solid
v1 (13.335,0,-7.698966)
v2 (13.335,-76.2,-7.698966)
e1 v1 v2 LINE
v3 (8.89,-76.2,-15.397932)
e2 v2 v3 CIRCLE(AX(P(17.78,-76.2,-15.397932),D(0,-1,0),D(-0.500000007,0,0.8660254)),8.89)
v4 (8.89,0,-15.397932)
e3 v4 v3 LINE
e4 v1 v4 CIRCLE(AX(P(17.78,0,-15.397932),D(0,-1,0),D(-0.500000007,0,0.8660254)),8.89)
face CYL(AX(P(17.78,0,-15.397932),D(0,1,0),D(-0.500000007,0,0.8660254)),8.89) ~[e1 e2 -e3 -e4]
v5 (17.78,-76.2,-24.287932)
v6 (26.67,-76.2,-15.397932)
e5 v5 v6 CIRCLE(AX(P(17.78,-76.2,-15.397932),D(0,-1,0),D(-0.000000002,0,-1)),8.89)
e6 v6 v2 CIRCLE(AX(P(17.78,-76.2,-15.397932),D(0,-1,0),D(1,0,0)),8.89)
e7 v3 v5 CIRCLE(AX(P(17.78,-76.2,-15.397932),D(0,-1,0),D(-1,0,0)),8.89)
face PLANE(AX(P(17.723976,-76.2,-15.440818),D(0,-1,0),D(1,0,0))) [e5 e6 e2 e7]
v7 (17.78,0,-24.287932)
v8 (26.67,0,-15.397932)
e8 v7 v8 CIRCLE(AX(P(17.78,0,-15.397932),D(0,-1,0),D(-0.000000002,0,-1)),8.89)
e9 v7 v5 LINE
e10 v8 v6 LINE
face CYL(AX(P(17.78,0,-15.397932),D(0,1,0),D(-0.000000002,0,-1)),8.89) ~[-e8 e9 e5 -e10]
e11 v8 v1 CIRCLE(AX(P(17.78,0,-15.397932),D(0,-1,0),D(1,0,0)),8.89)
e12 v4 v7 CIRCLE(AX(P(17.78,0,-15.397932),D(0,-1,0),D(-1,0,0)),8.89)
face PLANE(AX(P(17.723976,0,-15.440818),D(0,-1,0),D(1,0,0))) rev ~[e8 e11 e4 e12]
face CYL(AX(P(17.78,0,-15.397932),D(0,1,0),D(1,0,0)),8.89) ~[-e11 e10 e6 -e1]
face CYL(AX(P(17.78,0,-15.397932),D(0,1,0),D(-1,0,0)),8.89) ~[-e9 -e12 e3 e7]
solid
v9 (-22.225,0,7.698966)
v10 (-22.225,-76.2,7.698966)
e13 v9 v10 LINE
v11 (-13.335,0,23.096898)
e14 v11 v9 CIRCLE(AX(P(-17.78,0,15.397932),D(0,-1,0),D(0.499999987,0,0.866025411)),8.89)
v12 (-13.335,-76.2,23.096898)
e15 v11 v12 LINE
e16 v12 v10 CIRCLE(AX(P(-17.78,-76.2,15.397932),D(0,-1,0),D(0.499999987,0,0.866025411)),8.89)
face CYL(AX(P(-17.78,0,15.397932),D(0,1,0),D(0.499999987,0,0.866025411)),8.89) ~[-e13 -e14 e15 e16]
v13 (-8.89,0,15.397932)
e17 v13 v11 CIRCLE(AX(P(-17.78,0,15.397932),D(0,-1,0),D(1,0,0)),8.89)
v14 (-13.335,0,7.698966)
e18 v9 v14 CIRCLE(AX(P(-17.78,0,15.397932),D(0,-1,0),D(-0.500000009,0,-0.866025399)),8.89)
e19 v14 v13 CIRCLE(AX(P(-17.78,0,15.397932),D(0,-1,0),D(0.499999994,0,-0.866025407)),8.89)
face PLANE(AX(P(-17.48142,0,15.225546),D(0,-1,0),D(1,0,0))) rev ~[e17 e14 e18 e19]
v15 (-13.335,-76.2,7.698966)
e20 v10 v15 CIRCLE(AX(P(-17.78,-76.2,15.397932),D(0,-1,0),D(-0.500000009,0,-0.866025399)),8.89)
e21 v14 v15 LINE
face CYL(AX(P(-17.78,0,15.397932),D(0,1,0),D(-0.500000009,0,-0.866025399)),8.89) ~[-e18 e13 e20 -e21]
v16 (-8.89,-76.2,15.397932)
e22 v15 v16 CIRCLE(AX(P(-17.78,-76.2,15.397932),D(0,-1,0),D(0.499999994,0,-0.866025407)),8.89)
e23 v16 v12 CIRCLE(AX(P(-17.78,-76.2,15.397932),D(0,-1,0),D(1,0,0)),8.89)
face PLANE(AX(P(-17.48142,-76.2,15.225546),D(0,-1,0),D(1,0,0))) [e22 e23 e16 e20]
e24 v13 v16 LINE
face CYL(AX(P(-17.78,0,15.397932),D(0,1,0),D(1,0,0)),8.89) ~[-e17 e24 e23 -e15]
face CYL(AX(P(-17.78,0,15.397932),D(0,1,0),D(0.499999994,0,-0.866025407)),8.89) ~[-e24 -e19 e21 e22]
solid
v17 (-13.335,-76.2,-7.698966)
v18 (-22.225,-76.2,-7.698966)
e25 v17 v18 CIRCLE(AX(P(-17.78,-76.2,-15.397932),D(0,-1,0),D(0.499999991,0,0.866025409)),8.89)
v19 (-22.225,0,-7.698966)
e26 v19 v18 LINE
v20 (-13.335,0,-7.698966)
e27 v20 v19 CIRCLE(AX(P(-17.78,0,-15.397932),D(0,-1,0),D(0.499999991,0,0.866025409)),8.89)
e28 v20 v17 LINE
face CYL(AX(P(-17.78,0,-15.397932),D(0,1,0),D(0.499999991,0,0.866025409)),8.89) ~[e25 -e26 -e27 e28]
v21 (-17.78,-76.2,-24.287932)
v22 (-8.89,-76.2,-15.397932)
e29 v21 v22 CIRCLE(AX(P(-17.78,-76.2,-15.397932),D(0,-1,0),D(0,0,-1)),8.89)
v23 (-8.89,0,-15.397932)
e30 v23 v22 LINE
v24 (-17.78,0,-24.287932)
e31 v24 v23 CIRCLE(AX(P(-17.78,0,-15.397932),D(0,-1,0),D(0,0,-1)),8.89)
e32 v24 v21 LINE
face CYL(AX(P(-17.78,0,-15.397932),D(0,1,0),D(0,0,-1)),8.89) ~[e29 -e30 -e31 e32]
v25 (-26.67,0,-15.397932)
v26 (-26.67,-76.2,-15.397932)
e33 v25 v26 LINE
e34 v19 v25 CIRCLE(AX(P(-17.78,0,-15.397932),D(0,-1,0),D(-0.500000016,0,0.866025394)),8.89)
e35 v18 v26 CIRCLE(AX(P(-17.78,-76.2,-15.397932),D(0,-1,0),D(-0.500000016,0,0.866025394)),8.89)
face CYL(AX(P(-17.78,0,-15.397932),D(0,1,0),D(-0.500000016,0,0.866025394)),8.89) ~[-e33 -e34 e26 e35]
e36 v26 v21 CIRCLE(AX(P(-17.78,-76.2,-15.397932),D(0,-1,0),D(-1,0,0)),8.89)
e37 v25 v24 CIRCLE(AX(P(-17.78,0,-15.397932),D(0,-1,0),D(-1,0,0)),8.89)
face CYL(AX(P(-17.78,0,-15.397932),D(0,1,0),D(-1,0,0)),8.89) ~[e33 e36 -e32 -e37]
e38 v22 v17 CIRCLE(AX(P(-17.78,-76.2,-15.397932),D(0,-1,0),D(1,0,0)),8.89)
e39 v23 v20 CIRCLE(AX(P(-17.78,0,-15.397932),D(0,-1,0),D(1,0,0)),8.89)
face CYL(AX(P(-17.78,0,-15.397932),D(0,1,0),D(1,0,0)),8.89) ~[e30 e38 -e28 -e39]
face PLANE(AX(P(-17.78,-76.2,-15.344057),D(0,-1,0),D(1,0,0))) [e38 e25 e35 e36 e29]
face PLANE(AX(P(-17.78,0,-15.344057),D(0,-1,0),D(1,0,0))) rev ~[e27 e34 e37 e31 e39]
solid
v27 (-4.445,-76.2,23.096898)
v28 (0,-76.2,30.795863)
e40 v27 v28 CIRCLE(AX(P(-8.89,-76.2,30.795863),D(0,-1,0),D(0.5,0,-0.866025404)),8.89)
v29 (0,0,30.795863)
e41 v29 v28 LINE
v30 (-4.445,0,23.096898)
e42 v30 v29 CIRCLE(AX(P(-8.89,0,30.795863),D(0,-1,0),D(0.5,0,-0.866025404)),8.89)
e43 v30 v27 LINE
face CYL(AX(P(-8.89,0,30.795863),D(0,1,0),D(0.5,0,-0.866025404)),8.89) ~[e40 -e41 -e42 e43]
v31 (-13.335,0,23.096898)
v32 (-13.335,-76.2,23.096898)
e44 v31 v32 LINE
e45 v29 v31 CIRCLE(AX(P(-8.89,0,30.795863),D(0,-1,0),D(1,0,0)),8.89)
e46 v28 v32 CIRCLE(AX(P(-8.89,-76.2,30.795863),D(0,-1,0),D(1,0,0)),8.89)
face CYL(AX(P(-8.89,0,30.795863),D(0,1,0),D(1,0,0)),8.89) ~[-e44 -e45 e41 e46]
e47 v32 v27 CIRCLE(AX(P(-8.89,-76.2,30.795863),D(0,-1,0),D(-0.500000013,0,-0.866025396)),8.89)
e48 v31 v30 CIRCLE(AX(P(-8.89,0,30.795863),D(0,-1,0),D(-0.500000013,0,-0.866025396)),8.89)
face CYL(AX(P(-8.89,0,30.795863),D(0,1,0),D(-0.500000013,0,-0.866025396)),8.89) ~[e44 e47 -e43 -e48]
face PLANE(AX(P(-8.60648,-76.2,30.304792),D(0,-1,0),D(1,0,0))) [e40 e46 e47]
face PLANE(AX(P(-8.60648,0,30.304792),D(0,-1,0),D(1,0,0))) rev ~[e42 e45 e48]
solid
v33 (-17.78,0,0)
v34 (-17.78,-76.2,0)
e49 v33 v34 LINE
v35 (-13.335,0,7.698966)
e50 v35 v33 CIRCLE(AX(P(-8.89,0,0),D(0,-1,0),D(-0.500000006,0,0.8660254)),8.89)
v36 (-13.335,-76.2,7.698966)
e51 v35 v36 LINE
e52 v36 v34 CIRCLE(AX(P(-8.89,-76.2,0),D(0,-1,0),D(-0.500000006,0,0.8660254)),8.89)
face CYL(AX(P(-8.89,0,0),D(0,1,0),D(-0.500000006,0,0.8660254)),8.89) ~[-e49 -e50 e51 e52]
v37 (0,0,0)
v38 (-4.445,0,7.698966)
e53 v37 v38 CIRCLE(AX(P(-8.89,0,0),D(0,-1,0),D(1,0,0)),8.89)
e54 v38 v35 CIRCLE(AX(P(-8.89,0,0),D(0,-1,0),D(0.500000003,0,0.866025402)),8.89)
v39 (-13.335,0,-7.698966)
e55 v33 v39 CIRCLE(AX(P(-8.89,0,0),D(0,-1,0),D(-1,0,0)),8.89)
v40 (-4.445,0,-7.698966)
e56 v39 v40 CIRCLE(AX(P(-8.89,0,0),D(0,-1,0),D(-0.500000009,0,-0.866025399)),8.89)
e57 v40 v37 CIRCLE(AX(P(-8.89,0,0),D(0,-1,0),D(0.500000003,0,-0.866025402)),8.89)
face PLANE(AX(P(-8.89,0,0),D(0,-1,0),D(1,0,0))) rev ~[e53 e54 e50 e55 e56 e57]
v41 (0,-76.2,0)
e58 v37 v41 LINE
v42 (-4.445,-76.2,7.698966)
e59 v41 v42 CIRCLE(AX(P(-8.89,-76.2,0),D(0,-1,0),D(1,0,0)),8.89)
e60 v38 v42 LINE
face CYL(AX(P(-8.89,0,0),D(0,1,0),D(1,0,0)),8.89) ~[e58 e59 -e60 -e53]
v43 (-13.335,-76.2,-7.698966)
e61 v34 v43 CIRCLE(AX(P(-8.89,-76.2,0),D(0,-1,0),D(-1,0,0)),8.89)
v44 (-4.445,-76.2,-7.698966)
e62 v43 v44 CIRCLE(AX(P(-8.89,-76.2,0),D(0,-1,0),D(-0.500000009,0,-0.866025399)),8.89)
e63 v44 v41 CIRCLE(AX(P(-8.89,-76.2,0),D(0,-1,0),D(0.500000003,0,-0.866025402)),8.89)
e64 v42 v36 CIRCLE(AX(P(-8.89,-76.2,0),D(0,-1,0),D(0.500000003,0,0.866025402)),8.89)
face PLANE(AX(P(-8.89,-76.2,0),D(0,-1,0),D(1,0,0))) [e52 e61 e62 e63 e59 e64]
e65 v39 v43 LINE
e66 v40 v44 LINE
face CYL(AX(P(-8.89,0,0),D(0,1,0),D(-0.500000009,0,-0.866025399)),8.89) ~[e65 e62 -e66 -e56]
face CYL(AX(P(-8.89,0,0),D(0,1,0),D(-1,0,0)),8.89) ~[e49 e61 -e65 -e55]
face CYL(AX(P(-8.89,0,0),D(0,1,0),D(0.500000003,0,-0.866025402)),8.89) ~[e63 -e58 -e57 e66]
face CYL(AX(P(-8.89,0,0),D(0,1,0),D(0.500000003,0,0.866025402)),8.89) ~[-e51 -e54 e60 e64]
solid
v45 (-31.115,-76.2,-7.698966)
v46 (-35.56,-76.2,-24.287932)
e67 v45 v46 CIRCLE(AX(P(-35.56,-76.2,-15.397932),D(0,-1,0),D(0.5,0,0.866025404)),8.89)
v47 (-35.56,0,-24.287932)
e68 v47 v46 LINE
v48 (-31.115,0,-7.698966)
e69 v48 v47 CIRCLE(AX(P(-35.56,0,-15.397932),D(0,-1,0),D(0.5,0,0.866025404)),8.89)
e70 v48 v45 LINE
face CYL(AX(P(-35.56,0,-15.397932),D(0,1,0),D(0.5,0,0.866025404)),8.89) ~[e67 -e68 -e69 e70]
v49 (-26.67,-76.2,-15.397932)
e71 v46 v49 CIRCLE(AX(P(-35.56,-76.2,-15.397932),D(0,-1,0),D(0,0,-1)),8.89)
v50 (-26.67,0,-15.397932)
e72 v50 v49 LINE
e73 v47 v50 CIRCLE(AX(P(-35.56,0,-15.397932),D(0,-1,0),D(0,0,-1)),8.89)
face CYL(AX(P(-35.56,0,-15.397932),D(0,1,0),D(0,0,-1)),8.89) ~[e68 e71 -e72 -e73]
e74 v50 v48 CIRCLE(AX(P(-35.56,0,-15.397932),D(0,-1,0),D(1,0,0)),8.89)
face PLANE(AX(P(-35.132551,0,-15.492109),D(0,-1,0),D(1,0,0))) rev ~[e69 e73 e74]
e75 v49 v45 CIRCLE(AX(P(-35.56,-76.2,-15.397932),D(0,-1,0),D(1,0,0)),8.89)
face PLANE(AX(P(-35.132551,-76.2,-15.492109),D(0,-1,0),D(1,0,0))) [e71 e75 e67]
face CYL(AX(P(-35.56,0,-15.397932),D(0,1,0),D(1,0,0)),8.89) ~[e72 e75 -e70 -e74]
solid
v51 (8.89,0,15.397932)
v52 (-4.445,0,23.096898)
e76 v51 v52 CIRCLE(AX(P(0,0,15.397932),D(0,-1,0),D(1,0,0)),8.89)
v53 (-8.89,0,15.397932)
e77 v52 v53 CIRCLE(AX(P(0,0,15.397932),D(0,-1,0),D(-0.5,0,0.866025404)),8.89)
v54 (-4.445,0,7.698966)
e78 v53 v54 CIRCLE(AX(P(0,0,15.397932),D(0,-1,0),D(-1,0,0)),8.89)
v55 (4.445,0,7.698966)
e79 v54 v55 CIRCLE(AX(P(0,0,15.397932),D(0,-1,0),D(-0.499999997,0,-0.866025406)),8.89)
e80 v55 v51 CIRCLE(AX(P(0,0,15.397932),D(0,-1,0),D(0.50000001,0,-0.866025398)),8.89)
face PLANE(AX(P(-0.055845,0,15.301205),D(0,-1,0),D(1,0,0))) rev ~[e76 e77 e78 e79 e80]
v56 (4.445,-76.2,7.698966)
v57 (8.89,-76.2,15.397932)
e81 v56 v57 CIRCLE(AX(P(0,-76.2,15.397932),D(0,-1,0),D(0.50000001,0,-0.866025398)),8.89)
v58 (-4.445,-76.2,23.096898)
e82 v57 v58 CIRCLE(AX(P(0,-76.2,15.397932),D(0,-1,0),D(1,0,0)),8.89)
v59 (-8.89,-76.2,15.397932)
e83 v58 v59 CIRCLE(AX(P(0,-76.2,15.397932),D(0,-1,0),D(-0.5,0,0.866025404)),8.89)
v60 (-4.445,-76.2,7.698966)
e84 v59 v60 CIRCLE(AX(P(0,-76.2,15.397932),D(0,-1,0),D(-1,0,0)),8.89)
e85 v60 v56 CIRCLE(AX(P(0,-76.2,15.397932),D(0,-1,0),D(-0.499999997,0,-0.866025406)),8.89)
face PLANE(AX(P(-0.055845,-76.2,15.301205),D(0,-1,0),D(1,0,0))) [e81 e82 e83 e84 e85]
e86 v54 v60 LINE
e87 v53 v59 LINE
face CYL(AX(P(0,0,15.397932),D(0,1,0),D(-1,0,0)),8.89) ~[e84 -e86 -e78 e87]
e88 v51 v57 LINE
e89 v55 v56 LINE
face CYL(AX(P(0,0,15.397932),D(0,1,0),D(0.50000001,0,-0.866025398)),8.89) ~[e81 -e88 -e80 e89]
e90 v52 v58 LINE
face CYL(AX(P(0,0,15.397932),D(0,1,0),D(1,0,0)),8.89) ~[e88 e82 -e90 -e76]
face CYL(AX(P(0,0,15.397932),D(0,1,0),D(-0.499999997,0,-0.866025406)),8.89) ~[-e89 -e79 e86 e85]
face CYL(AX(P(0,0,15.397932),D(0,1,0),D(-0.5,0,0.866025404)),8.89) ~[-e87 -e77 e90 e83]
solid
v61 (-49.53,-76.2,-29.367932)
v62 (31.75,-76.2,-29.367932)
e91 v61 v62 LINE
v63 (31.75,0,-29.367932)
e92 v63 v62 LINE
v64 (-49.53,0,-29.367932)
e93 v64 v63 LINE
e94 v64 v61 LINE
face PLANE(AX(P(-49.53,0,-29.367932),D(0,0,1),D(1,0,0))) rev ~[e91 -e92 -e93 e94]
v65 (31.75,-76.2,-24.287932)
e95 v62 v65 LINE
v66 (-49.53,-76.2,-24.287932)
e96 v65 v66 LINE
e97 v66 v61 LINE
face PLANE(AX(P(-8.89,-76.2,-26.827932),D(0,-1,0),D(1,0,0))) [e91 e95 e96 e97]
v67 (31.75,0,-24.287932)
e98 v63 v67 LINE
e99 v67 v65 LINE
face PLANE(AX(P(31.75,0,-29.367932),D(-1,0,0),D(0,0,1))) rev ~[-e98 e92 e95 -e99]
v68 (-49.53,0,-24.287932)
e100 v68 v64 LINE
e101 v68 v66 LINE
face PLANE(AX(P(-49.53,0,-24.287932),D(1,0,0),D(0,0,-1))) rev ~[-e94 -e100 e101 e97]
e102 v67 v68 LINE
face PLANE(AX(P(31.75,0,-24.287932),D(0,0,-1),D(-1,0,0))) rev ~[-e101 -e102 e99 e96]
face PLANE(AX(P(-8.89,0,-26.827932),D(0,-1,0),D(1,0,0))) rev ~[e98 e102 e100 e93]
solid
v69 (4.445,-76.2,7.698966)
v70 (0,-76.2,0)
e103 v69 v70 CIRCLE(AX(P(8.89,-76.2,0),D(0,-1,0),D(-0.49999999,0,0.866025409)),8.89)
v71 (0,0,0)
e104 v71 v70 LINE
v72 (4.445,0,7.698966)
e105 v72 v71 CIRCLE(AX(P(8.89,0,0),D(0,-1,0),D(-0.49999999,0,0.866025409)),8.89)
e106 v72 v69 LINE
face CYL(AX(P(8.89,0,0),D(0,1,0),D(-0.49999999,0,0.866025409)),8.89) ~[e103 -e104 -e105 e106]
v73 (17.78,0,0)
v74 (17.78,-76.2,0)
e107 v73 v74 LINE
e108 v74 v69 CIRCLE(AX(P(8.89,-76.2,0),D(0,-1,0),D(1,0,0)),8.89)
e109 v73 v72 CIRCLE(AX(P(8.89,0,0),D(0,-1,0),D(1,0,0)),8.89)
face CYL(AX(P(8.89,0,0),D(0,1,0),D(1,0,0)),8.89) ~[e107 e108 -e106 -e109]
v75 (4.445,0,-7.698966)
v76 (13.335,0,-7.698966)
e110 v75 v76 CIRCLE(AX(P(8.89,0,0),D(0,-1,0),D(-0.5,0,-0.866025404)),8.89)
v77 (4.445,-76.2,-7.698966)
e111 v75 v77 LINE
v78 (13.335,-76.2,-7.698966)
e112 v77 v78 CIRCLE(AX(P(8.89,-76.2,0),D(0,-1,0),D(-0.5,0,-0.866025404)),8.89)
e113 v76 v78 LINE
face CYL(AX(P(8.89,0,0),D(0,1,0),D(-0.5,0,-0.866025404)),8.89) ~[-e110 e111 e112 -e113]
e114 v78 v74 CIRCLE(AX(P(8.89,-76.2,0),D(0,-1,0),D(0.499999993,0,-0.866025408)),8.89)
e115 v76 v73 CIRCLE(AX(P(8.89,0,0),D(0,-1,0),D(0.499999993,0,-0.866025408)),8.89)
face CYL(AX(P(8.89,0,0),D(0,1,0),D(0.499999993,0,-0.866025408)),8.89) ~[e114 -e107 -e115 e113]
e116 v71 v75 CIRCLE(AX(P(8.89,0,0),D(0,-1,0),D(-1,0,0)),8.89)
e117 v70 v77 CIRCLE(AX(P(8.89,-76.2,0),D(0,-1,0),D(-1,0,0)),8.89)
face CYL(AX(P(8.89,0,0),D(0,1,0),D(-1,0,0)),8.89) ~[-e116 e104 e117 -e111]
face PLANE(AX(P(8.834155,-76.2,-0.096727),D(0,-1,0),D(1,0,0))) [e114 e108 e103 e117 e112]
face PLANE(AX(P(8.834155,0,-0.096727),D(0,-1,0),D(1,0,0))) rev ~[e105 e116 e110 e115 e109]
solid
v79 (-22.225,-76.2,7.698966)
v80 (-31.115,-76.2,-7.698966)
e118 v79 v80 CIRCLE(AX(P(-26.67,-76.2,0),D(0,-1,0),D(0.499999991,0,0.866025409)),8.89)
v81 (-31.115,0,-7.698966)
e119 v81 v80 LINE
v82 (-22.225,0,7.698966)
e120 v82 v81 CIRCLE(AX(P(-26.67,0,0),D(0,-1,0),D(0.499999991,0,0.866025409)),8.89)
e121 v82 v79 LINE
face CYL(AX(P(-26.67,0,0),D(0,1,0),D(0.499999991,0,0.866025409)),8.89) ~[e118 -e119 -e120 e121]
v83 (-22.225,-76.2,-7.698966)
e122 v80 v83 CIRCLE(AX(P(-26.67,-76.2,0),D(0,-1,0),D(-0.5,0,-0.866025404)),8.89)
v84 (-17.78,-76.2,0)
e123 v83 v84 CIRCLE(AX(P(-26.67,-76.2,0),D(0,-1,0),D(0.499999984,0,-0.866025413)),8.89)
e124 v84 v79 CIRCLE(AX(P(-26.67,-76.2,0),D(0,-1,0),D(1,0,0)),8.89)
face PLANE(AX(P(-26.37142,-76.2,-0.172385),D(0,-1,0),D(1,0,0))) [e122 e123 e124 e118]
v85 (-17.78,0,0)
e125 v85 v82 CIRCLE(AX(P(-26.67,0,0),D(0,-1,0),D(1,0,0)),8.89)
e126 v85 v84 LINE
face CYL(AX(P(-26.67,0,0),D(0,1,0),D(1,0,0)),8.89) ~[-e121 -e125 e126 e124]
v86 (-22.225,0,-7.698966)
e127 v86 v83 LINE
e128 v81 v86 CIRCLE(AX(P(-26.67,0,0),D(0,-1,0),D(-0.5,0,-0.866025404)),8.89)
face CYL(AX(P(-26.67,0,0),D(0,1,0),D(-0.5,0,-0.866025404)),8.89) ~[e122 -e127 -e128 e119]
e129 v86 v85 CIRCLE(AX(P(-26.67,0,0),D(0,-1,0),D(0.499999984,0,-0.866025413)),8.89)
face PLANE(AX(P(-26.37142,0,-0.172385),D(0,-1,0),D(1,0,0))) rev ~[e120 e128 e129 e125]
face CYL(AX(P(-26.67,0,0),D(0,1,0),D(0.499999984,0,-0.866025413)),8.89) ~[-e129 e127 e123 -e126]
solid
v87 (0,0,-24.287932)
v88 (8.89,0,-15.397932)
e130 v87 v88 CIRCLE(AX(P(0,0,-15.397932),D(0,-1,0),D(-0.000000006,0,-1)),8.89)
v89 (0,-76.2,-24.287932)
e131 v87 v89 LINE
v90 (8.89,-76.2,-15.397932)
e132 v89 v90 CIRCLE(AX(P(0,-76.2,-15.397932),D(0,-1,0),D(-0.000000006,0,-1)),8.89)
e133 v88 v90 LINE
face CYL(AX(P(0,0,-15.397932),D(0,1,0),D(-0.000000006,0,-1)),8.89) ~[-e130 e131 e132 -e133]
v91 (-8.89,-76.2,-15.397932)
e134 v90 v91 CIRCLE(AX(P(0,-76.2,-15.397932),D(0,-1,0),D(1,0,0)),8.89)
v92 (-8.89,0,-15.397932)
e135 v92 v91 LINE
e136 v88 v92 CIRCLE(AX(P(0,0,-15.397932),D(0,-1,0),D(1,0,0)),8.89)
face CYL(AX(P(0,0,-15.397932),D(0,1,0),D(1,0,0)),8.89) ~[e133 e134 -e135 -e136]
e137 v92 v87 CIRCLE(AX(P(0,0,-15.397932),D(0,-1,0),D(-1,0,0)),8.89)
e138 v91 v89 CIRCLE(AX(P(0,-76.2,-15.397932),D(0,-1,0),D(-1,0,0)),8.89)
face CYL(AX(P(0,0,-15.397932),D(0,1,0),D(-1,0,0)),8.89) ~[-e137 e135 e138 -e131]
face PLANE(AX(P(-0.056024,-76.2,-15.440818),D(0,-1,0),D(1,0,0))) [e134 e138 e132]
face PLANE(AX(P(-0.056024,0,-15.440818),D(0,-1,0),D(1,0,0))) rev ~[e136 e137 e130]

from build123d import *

# Parameters (mm, degrees)
F1_DEPTH = 76.2


# Not quite as in the source:
# - a feature names something its author has since deleted; it is built from what else it names


with BuildPart() as f1:
    # F0 (on Front) → F1 (new body)
    with BuildSketch(Plane.XZ):
        with BuildLine():
            ThreePointArc((-22.2250001435, -7.6989659225), (-18.9710342018, -4.4450000718), (-17.78, 0))
            ThreePointArc((-17.78, 0), (-18.9710341832, 4.4450000396), (-22.2250000791, 7.6989658853))
            ThreePointArc((-22.2250000791, 7.6989658853), (-34.3689658613, 4.4449999625), (-31.1150000042, -7.6989658372))
            ThreePointArc((-31.1150000042, -7.6989658372), (-26.6700000853, -8.89), (-22.2250001435, -7.6989659225))
        make_face()
    extrude(amount=F1_DEPTH)


with BuildPart() as f1b:
    # F0 (on Front) → F1, piece 2 (new body)
    with BuildSketch(Plane.XZ):
        with BuildLine():
            ThreePointArc((-13.3350000511, 7.6989658101), (-16.5889658544, 4.4449999744), (-17.78, 0))
            ThreePointArc((-17.78, 0), (-16.5889658625, -4.4449999603), (-13.3350000793, -7.6989657939))
            ThreePointArc((-13.3350000793, -7.6989657939), (-8.8900000289, -8.89), (-4.4449999708, -7.6989658228))
            ThreePointArc((-4.4449999708, -7.6989658228), (-1.1910341519, -4.4449999854), (0, 0))
            ThreePointArc((0, 0), (-1.1910341518, 4.4449999853), (-4.4449999705, 7.6989658226))
            ThreePointArc((-4.4449999705, 7.6989658226), (-8.8900000125, 8.89), (-13.3350000511, 7.6989658101))
        make_face()
    extrude(amount=F1_DEPTH)


with BuildPart() as f1c:
    # F0 (on Front) → F1, piece 3 (new body)
    with BuildSketch(Plane.XZ):
        with BuildLine():
            ThreePointArc((-13.3350001127, 23.096897584), (-25.4789658493, 19.8429316625), (-22.2250000791, 7.6989658853))
            ThreePointArc((-22.2250000791, 7.6989658853), (-17.7800000752, 6.5079316793), (-13.3350000511, 7.6989658101))
            ThreePointArc((-13.3350000511, 7.6989658101), (-10.0810341751, 10.9529316537), (-8.89, 15.3979316793))
            ThreePointArc((-8.89, 15.3979316793), (-10.0810341929, 19.8429317356), (-13.3350001127, 23.096897584))
        make_face()
    extrude(amount=F1_DEPTH)


with BuildPart() as f1d:
    # F0 (on Front) → F1, piece 4 (new body)
    with BuildSketch(Plane.XZ):
        with BuildLine():
            ThreePointArc((-13.3350000793, -7.6989657939), (-17.7800001286, -6.5079316793), (-22.2250001435, -7.6989659225))
            ThreePointArc((-22.2250001435, -7.6989659225), (-25.4789658811, -10.952931751), (-26.67, -15.3979316793))
            ThreePointArc((-26.67, -15.3979316793), (-24.0661792847, -21.684110964), (-17.78, -24.2879316793))
            ThreePointArc((-17.78, -24.2879316793), (-11.4938207153, -21.684110964), (-8.89, -15.3979316793))
            ThreePointArc((-8.89, -15.3979316793), (-10.0810341832, -10.9529316396), (-13.3350000793, -7.6989657939))
        make_face()
    extrude(amount=F1_DEPTH)


with BuildPart() as f1e:
    # F0 (on Front) → F1, piece 5 (new body)
    with BuildSketch(Plane.XZ):
        with BuildLine():
            ThreePointArc((-26.67, -15.3979316793), (-27.8610341616, -10.9529316772), (-31.1150000042, -7.6989658372))
            ThreePointArc((-31.1150000042, -7.6989658372), (-44.1470805963, -13.0970303707), (-35.56, -24.2879316793))
            ThreePointArc((-35.56, -24.2879316793), (-29.2738207153, -21.684110964), (-26.67, -15.3979316793))
        make_face()
    extrude(amount=F1_DEPTH)


with BuildPart() as f1f:
    # F0 (on Front) → F1, piece 6 (new body)
    with BuildSketch(Plane.XZ):
        with BuildLine():
            ThreePointArc((0, 30.7958633586), (-13.3349999436, 38.4948292308), (-13.3350001127, 23.096897584))
            ThreePointArc((-13.3350001127, 23.096897584), (-8.8900000658, 21.9058633586), (-4.4450000013, 23.0968975182))
            ThreePointArc((-4.4450000013, 23.0968975182), (-1.1910341607, 26.3508633579), (0, 30.7958633586))
        make_face()
    extrude(amount=F1_DEPTH)


with BuildPart() as f1g:
    # F0 (on Front) → F1, piece 7 (new body)
    with BuildSketch(Plane.XZ):
        with BuildLine():
            ThreePointArc((-8.89, 15.3979316793), (-7.6989658311, 10.9529316645), (-4.4449999705, 7.6989658226))
            ThreePointArc((-4.4449999705, 7.6989658226), (6.75e-08, 6.5079316793), (4.4450000875, 7.6989658901))
            ThreePointArc((4.4450000875, 7.6989658901), (7.6989658649, 10.952931723), (8.89, 15.3979316793))
            ThreePointArc((8.89, 15.3979316793), (4.4449999993, 23.0968975193), (-4.4450000013, 23.0968975182))
            ThreePointArc((-4.4450000013, 23.0968975182), (-7.69896584, 19.8429316786), (-8.89, 15.3979316793))
        make_face()
    extrude(amount=F1_DEPTH)


with BuildPart() as f1h:
    # F0 (on Front) → F1, piece 8 (new body)
    with BuildSketch(Plane.XZ):
        with BuildLine():
            ThreePointArc((4.4450000013, -7.6989658404), (1.76e-08, -6.5079316793), (-4.4449999708, -7.6989658228))
            ThreePointArc((-4.4449999708, -7.6989658228), (-7.6989658312, -10.9529316647), (-8.89, -15.3979316793))
            ThreePointArc((-8.89, -15.3979316793), (-6.2861793033, -21.6841109454), (-5.26e-08, -24.2879316793))
            ThreePointArc((-5.26e-08, -24.2879316793), (6.2861792662, -21.6841109826), (8.89, -15.3979316793))
            ThreePointArc((8.89, -15.3979316793), (7.69896584, -10.9529316799), (4.4450000013, -7.6989658404))
        make_face()
    extrude(amount=F1_DEPTH)


with BuildPart() as f1i:
    # F0 (on Front) → F1, piece 9 (new body)
    with BuildSketch(Plane.XZ):
        Polygon((-17.78, -24.2879316793), (-35.56, -24.2879316793), (-49.53, -24.2879316793), (-49.53, -29.3679316793), (31.75, -29.3679316793), (31.75, -24.2879316793), (17.7799999808, -24.2879316793), (-5.26e-08, -24.2879316793), align=None)
    extrude(amount=F1_DEPTH)


with BuildPart() as f1j:
    # F0 (on Front) → F1, piece 10 (new body)
    with BuildSketch(Plane.XZ):
        with BuildLine():
            ThreePointArc((4.4450000875, 7.6989658901), (1.1910341856, 4.4450000437), (0, 0))
            ThreePointArc((0, 0), (1.1910341607, -4.4450000007), (4.4450000013, -7.6989658404))
            ThreePointArc((4.4450000013, -7.6989658404), (8.8899999644, -8.89), (13.3349999371, -7.698965876))
            ThreePointArc((13.3349999371, -7.698965876), (16.5889658215, -4.4450000314), (17.78, 0))
            ThreePointArc((17.78, 0), (13.3350000437, 7.6989658144), (4.4450000875, 7.6989658901))
        make_face()
    extrude(amount=F1_DEPTH)


with BuildPart() as f1k:
    # F0 (on Front) → F1, piece 11 (new body)
    with BuildSketch(Plane.XZ):
        with BuildLine():
            ThreePointArc((26.67, -15.3979316793), (22.2249999686, -7.6989658215), (13.3349999371, -7.698965876))
            ThreePointArc((13.3349999371, -7.698965876), (10.0810341422, -10.9529317107), (8.89, -15.3979316793))
            ThreePointArc((8.89, -15.3979316793), (11.4938207085, -21.6841109572), (17.7799999808, -24.2879316793))
            ThreePointArc((17.7799999808, -24.2879316793), (24.066179278, -21.6841109708), (26.67, -15.3979316793))
        make_face()
    extrude(amount=F1_DEPTH)


solid = Compound([f1.part, f1b.part, f1c.part, f1d.part, f1e.part, f1f.part, f1g.part, f1h.part, f1i.part, f1j.part, f1k.part])
